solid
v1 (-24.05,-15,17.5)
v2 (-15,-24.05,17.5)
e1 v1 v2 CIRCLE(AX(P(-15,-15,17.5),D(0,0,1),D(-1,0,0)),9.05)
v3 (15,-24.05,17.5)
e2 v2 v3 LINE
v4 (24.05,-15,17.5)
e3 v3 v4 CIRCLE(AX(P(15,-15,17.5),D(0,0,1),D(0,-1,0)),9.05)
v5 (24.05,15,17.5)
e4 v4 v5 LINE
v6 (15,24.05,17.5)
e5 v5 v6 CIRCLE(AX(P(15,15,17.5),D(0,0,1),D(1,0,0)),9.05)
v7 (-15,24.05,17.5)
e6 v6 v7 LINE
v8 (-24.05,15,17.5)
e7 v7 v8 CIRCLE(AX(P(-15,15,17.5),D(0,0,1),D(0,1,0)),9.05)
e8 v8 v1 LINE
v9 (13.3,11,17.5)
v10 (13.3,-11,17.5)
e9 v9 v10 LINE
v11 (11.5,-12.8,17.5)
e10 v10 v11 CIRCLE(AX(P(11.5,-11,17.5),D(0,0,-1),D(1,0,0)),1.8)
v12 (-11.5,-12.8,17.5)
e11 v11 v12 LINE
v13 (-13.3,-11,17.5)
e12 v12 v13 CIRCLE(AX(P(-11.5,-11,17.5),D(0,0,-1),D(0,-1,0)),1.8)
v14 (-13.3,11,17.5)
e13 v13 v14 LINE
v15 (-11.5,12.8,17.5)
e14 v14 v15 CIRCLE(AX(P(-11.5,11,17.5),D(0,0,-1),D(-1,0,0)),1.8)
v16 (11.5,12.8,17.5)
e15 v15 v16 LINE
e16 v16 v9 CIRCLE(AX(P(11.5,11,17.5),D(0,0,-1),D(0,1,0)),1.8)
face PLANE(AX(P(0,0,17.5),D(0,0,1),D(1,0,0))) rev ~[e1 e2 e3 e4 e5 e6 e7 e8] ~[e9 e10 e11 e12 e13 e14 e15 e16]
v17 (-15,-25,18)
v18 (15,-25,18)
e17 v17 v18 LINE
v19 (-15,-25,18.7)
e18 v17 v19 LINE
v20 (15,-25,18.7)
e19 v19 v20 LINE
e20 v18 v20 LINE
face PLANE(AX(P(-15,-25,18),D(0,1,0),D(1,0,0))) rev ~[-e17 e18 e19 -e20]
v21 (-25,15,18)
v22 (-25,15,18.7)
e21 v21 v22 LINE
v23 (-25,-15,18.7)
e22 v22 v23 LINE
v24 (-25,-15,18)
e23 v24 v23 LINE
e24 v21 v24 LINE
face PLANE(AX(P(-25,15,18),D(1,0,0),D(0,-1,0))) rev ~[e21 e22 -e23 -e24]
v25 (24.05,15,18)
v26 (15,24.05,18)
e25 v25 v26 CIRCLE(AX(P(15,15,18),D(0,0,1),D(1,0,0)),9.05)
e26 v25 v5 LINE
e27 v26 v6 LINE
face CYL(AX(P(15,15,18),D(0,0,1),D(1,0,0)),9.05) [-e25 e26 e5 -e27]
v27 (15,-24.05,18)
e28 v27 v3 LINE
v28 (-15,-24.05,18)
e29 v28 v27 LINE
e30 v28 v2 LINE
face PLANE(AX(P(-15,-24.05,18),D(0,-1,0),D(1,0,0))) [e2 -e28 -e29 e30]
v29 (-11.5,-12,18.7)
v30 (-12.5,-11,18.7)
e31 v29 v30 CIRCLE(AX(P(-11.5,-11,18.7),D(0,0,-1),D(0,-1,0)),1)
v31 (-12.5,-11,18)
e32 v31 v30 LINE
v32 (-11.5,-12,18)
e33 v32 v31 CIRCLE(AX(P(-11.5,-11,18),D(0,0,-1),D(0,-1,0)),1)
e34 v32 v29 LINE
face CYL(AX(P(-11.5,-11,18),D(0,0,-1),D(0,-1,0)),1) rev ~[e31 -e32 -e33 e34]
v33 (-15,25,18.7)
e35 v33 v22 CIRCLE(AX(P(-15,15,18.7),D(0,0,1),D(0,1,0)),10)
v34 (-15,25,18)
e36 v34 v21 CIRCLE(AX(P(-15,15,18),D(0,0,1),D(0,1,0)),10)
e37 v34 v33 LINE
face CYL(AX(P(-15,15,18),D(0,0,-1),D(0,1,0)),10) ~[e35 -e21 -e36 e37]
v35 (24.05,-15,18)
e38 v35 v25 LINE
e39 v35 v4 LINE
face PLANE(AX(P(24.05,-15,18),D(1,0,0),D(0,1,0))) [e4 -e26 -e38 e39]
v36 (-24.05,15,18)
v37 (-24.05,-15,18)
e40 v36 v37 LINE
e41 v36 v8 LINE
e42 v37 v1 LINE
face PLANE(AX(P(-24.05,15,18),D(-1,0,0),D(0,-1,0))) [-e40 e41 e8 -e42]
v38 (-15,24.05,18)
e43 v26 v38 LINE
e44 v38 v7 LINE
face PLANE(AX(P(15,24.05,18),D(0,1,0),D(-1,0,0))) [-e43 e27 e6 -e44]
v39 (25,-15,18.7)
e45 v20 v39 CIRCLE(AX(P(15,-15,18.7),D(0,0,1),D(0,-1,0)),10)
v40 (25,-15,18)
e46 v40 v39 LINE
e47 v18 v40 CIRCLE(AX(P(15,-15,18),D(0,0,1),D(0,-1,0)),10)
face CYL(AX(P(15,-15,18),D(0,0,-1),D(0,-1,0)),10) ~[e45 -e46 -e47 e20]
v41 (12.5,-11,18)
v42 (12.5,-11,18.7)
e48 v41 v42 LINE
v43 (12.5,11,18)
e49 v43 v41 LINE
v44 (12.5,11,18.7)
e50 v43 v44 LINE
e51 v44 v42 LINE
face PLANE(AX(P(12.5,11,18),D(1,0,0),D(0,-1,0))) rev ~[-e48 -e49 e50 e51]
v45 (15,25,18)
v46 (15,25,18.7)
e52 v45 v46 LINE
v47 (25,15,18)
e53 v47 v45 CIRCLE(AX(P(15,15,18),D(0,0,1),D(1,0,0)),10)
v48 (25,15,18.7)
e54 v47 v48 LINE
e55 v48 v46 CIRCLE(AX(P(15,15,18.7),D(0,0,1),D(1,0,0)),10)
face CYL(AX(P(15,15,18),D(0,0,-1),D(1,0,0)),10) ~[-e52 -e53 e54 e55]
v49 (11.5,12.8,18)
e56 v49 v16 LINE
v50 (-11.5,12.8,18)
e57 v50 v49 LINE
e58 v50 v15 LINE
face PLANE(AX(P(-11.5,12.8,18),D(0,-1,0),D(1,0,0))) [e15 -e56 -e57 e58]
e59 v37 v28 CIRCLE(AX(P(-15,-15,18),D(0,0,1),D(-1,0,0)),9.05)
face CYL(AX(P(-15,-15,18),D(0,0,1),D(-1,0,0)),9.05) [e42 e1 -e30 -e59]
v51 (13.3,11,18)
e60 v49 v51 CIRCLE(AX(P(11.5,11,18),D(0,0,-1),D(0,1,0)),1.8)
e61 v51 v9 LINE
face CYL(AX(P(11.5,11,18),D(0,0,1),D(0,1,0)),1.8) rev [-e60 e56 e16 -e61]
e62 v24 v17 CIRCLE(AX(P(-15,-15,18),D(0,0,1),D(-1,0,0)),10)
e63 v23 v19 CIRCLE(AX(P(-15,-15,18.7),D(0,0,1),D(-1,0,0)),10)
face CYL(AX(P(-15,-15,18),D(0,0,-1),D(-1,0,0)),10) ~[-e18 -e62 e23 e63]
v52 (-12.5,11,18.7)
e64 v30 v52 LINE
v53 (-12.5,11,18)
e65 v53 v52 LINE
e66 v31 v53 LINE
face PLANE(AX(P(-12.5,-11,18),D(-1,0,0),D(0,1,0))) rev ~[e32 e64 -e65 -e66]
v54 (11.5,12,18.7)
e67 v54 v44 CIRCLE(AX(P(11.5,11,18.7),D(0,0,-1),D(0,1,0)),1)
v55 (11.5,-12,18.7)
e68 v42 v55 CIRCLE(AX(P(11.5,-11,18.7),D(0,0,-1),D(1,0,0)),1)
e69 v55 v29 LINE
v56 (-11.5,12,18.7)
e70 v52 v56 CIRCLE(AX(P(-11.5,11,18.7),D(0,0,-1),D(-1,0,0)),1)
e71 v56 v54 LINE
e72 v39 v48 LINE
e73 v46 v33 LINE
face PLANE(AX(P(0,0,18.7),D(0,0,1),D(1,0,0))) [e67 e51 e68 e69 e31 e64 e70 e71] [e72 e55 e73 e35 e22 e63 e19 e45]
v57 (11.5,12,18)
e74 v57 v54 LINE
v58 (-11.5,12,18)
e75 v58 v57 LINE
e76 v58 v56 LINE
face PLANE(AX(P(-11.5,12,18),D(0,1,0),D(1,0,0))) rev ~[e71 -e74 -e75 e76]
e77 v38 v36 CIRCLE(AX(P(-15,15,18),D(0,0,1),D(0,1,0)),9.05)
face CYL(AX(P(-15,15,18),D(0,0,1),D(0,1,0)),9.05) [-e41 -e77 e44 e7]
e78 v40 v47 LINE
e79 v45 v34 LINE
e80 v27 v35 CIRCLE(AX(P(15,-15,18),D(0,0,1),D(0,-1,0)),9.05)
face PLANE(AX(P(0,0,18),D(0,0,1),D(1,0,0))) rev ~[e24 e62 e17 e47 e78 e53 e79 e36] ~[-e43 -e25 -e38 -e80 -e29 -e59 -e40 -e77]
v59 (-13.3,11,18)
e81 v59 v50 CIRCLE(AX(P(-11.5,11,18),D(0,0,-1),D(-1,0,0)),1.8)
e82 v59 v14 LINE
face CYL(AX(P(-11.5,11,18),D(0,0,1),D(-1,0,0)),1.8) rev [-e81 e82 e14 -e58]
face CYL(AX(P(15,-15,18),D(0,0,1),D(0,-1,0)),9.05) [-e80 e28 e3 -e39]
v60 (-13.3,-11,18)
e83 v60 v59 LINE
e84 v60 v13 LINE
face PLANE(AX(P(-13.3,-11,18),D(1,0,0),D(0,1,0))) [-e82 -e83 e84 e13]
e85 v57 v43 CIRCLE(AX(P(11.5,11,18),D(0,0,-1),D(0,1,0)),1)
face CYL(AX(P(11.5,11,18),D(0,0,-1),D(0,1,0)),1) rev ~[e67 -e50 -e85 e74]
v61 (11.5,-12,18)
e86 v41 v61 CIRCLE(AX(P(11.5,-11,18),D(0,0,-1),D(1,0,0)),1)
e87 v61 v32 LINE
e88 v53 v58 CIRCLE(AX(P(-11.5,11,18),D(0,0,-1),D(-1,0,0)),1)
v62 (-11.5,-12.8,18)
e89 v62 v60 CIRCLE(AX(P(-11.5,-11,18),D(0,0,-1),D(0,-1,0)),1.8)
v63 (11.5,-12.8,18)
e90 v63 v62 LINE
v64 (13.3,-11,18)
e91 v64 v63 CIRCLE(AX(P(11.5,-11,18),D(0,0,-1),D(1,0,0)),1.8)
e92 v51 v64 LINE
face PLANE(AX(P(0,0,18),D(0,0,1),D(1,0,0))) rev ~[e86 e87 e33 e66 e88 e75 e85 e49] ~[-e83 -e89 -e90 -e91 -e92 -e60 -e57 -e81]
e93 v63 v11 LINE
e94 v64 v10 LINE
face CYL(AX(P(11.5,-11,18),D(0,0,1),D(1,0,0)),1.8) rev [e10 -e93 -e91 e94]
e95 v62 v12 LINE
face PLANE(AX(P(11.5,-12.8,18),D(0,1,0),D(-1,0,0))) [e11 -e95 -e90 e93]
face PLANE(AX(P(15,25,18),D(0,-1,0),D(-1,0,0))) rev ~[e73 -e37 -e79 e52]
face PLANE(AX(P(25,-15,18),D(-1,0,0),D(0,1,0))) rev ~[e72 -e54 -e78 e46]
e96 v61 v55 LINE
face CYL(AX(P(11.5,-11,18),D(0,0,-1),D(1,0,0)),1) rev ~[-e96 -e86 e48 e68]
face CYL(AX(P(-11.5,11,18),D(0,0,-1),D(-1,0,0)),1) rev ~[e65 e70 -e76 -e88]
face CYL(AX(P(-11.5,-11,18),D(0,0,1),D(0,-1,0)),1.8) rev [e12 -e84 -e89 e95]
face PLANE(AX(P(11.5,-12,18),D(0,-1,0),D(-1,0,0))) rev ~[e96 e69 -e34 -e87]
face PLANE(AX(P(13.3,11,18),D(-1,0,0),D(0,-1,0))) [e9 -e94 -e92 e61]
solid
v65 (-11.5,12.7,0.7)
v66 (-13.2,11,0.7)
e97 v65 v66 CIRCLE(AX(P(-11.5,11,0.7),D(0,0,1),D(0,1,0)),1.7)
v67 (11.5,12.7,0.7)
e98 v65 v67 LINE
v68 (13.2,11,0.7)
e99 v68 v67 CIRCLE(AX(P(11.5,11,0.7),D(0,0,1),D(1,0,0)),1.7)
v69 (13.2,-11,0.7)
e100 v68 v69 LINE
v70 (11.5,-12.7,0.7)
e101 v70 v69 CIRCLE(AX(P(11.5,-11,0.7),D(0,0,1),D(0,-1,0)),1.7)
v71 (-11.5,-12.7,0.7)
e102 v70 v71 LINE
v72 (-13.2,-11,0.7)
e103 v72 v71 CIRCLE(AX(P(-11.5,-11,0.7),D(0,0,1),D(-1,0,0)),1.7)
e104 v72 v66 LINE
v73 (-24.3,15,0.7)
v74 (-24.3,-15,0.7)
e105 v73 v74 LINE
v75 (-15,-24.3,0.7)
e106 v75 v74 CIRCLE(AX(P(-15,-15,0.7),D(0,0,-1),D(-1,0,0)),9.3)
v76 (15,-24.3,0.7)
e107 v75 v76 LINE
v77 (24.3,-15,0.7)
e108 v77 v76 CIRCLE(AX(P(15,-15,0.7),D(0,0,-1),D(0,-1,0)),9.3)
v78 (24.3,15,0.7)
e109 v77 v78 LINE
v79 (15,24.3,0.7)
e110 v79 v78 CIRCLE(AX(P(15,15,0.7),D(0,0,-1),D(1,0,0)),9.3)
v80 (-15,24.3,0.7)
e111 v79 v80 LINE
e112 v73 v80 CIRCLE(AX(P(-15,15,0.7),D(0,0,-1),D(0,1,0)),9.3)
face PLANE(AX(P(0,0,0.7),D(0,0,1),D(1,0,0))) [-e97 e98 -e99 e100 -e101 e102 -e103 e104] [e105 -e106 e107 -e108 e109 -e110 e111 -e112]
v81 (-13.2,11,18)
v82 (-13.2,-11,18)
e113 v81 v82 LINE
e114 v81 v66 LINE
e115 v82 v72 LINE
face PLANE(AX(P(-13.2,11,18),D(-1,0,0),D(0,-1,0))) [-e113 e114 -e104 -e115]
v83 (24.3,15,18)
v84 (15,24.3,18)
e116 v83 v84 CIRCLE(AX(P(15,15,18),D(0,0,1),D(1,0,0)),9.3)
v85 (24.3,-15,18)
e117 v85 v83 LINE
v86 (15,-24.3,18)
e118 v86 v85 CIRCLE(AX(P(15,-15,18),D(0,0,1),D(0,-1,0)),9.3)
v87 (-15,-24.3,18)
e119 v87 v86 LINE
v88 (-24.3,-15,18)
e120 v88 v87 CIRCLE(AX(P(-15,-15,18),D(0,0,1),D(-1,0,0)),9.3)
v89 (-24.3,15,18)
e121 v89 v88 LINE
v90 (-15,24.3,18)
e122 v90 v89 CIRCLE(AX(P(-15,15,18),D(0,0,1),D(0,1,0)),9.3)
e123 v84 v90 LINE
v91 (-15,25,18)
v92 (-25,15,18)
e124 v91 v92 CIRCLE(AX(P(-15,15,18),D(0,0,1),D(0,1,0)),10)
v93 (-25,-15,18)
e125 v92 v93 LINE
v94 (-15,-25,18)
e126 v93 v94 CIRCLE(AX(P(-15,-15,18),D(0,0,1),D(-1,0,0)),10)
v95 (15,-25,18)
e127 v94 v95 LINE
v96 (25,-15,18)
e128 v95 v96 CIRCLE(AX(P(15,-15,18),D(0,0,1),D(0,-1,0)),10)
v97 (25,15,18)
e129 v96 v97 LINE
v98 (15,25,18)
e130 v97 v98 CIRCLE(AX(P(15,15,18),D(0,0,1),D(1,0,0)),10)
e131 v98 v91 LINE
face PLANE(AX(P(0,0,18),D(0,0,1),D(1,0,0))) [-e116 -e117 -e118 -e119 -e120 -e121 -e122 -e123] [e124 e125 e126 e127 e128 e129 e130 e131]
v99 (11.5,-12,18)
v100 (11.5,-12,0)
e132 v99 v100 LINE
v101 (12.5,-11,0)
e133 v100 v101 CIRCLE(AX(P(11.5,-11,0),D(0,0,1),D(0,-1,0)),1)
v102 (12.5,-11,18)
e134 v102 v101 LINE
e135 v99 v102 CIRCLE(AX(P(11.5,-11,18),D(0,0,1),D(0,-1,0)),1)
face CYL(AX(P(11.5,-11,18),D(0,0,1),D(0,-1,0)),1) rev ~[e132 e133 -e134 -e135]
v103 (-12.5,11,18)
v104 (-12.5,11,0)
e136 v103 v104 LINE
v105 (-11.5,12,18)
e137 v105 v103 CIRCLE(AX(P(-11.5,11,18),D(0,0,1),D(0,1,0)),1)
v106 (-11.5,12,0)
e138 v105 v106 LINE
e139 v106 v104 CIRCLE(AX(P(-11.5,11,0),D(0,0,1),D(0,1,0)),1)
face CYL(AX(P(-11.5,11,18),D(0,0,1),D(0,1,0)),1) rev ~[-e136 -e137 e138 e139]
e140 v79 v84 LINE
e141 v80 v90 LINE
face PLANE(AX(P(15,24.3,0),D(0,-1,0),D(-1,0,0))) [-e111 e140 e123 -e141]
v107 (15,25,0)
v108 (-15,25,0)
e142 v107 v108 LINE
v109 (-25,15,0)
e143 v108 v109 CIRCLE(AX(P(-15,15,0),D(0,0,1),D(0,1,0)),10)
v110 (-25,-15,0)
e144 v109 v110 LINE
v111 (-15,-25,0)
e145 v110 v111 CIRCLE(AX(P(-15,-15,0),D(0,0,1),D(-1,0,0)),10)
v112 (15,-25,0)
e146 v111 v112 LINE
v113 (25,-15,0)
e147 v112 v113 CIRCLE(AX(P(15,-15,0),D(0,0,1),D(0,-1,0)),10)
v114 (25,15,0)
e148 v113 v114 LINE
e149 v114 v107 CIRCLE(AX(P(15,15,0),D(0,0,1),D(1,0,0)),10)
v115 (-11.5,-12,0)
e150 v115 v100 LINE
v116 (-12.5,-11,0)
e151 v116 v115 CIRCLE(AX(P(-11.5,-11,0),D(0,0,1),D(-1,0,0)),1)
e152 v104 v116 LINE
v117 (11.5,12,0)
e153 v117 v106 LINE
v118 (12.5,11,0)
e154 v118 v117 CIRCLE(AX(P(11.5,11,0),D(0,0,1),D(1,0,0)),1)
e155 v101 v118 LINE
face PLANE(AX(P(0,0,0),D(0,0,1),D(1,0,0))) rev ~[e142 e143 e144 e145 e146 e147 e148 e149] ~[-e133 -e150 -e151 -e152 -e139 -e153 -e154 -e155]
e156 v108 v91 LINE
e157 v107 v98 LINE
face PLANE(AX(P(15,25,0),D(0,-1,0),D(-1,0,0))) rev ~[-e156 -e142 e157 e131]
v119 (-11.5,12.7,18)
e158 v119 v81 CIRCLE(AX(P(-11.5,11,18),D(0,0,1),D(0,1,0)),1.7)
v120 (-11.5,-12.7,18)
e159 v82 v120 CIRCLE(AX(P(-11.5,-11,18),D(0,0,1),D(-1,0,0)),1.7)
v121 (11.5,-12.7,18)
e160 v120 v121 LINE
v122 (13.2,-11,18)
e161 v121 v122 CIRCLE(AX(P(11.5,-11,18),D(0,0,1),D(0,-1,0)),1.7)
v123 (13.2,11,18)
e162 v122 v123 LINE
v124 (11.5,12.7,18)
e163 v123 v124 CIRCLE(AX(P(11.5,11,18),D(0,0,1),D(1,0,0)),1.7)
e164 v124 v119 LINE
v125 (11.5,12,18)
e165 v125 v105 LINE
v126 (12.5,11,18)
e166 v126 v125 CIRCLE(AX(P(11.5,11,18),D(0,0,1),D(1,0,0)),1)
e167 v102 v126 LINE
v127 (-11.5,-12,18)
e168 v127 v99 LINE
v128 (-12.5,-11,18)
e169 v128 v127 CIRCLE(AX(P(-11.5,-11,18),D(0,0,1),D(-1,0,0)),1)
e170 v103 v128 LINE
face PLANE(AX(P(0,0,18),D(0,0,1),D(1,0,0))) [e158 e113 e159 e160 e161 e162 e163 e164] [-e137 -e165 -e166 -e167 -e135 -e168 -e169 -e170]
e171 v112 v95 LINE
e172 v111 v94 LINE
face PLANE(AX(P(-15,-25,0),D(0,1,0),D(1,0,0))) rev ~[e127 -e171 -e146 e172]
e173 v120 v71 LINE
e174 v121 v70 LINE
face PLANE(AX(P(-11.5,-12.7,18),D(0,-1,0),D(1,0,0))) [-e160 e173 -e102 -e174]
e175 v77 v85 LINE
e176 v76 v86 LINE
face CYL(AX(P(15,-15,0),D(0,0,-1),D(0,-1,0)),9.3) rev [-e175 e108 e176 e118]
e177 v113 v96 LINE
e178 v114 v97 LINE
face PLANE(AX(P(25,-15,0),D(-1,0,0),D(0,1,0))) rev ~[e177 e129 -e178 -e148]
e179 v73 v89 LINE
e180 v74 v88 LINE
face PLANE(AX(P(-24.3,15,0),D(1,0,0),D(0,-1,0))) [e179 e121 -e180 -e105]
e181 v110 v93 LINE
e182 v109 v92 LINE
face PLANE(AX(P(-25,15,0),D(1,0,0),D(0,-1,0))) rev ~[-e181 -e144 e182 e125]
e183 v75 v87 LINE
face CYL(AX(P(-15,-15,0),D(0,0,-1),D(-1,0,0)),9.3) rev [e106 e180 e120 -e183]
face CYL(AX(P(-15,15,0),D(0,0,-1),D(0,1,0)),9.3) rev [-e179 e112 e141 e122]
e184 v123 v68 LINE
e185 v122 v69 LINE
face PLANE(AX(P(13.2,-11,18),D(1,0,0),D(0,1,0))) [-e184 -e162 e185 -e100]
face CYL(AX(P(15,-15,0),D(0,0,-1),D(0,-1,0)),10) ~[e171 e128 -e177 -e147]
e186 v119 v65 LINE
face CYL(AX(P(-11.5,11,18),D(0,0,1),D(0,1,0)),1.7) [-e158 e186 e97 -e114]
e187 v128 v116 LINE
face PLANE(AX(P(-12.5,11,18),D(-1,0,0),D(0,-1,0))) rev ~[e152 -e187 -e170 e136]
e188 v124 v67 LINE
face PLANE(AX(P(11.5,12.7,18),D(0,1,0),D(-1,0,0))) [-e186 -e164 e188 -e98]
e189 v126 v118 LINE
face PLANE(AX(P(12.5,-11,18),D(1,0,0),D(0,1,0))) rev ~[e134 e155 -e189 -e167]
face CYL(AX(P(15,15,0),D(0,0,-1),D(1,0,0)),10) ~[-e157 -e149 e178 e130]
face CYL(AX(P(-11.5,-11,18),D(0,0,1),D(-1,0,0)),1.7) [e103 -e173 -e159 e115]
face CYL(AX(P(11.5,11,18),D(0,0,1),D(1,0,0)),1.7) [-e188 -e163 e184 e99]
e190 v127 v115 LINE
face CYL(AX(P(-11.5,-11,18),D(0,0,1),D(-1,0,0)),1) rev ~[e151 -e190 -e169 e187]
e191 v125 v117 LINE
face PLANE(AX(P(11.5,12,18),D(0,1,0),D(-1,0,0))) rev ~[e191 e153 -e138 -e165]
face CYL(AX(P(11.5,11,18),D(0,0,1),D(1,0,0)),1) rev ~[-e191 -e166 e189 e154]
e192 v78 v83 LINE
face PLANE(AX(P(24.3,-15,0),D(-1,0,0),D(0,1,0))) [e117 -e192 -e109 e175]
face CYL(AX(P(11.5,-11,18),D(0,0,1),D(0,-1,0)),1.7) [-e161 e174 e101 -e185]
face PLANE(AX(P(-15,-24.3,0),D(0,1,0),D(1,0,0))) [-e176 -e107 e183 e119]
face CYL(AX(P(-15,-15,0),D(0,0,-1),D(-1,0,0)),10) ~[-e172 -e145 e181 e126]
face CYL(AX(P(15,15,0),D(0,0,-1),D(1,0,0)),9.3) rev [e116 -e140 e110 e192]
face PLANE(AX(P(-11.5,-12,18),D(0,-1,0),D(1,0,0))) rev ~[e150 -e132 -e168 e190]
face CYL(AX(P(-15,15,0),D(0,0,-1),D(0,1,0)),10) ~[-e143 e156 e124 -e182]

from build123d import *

# Parameters (mm, degrees)
F1_DEPTH = 18
F3_DEPTH = 18.001
F4_T     = -0.7
F6_DEPTH = 0.5
F8_DEPTH = 0.7


with BuildPart() as f1:
    # F0 (on Top) → F1 (new body)
    with BuildSketch(Plane.XY):
        with BuildLine():
            ThreePointArc((25, 15), (22.0710678119, 22.0710678119), (15, 25))
            Line((15, 25), (-15, 25))
            ThreePointArc((-15, 25), (-22.0710678119, 22.0710678119), (-25, 15))
            Line((-25, 15), (-25, -15))
            ThreePointArc((-25, -15), (-22.0710678119, -22.0710678119), (-15, -25))
            Line((-15, -25), (15, -25))
            ThreePointArc((15, -25), (22.0710678119, -22.0710678119), (25, -15))
            Line((25, -15), (25, 15))
        make_face()
    extrude(amount=F1_DEPTH)

    # F2 (on face) → F3 (cut, through all)
    with BuildSketch(Plane.XY.offset(18)):
        with BuildLine():
            ThreePointArc((12.5, 11), (12.2071067812, 11.7071067812), (11.5, 12))
            Line((11.5, 12), (-11.5, 12))
            ThreePointArc((-11.5, 12), (-12.2071067812, 11.7071067812), (-12.5, 11))
            Line((-12.5, 11), (-12.5, -11))
            ThreePointArc((-12.5, -11), (-12.2071067812, -11.7071067812), (-11.5, -12))
            Line((-11.5, -12), (11.5, -12))
            ThreePointArc((11.5, -12), (12.2071067812, -11.7071067812), (12.5, -11))
            Line((12.5, -11), (12.5, 11))
        make_face()
    extrude(amount=-F3_DEPTH, mode=Mode.SUBTRACT)

    # F4
    f4_openings = [f1.faces().sort_by_distance(p)[0] for p in [
        (24.292893, 0, 18),
    ]]
    offset(amount=F4_T, openings=f4_openings)


with BuildPart() as f6:
    # F5 (on face) → F6 (new body)
    with BuildSketch(Plane.XY.offset(18)):
        with BuildLine():
            Line((-24.05, 15), (-24.05, -15))
            ThreePointArc((-24.05, -15), (-21.3993163697, -21.3993163697), (-15, -24.05))
            Line((-15, -24.05), (15, -24.05))
            ThreePointArc((15, -24.05), (21.3993163697, -21.3993163697), (24.05, -15))
            Line((24.05, -15), (24.05, 15))
            ThreePointArc((24.05, 15), (21.3993163697, 21.3993163697), (15, 24.05))
            Line((15, 24.05), (-15, 24.05))
            ThreePointArc((-15, 24.05), (-21.3993163697, 21.3993163697), (-24.05, 15))
        make_face()
        with BuildLine():
            ThreePointArc((15, 23.5), (21.0104076401, 21.0104076401), (23.5, 15))
            Line((23.5, 15), (23.5, -15))
            ThreePointArc((23.5, -15), (21.0104076401, -21.0104076401), (15, -23.5))
            Line((15, -23.5), (-15, -23.5))
            ThreePointArc((-15, -23.5), (-21.0104076401, -21.0104076401), (-23.5, -15))
            Line((-23.5, -15), (-23.5, 15))
            ThreePointArc((-23.5, 15), (-21.0104076401, 21.0104076401), (-15, 23.5))
            Line((-15, 23.5), (15, 23.5))
        make_face(mode=Mode.SUBTRACT)
        with BuildLine():
            Line((23.5, -15), (23.5, 15))
            ThreePointArc((23.5, 15), (21.0104076401, 21.0104076401), (15, 23.5))
            Line((15, 23.5), (-15, 23.5))
            ThreePointArc((-15, 23.5), (-21.0104076401, 21.0104076401), (-23.5, 15))
            Line((-23.5, 15), (-23.5, -15))
            ThreePointArc((-23.5, -15), (-21.0104076401, -21.0104076401), (-15, -23.5))
            Line((-15, -23.5), (15, -23.5))
            ThreePointArc((15, -23.5), (21.0104076401, -21.0104076401), (23.5, -15))
        make_face()
        with BuildLine():
            ThreePointArc((11.5, 12.8), (12.7727922061, 12.2727922061), (13.3, 11))
            Line((13.3, 11), (13.3, -11))
            ThreePointArc((13.3, -11), (12.7727922061, -12.2727922061), (11.5, -12.8))
            Line((11.5, -12.8), (-11.5, -12.8))
            ThreePointArc((-11.5, -12.8), (-12.7727922061, -12.2727922061), (-13.3, -11))
            Line((-13.3, -11), (-13.3, 11))
            ThreePointArc((-13.3, 11), (-12.7727922061, 12.2727922061), (-11.5, 12.8))
            Line((-11.5, 12.8), (11.5, 12.8))
        make_face(mode=Mode.SUBTRACT)
    extrude(amount=-F6_DEPTH)

    # F7 (on face) + F6_face1 (on face) → F8 (join)
    with BuildSketch(Plane.XY.offset(18)):
        with BuildLine():
            Line((15, 25), (-15, 25))
            ThreePointArc((-15, 25), (-22.0710678119, 22.0710678119), (-25, 15))
            Line((-25, 15), (-25, -15))
            ThreePointArc((-25, -15), (-22.0710678119, -22.0710678119), (-15, -25))
            Line((-15, -25), (15, -25))
            ThreePointArc((15, -25), (22.0710678119, -22.0710678119), (25, -15))
            Line((25, -15), (25, 15))
            ThreePointArc((25, 15), (22.0710678119, 22.0710678119), (15, 25))
        make_face()
        with BuildLine():
            Line((-12.5, -11), (-12.5, 11))
            ThreePointArc((-12.5, 11), (-12.2071067812, 11.7071067812), (-11.5, 12))
            Line((-11.5, 12), (11.5, 12))
            ThreePointArc((11.5, 12), (12.2071067812, 11.7071067812), (12.5, 11))
            Line((12.5, 11), (12.5, -11))
            ThreePointArc((12.5, -11), (12.2071067812, -11.7071067812), (11.5, -12))
            Line((11.5, -12), (-11.5, -12))
            ThreePointArc((-11.5, -12), (-12.2071067812, -11.7071067812), (-12.5, -11))
        make_face(mode=Mode.SUBTRACT)
    with BuildSketch(Plane(origin=(0, 0, 17.5), x_dir=(1, 0, 0), z_dir=(0, 0, -1))):
        with BuildLine():
            Line((-15, -24.05), (15, -24.05))
            ThreePointArc((15, -24.05), (21.3993163697, -21.3993163697), (24.05, -15))
            Line((24.05, -15), (24.05, 15))
            ThreePointArc((24.05, 15), (21.3993163697, 21.3993163697), (15, 24.05))
            Line((15, 24.05), (-15, 24.05))
            ThreePointArc((-15, 24.05), (-21.3993163697, 21.3993163697), (-24.05, 15))
            Line((-24.05, 15), (-24.05, -15))
            ThreePointArc((-24.05, -15), (-21.3993163697, -21.3993163697), (-15, -24.05))
        make_face()
        with BuildLine():
            ThreePointArc((13.3, -11), (12.7727922061, -12.2727922061), (11.5, -12.8))
            Line((11.5, -12.8), (-11.5, -12.8))
            ThreePointArc((-11.5, -12.8), (-12.7727922061, -12.2727922061), (-13.3, -11))
            Line((-13.3, -11), (-13.3, 11))
            ThreePointArc((-13.3, 11), (-12.7727922061, 12.2727922061), (-11.5, 12.8))
            Line((-11.5, 12.8), (11.5, 12.8))
            ThreePointArc((11.5, 12.8), (12.7727922061, 12.2727922061), (13.3, 11))
            Line((13.3, 11), (13.3, -11))
        make_face(mode=Mode.SUBTRACT)
    extrude(amount=F8_DEPTH, dir=(0, 0, 1))


solid = Compound([f1.part, f6.part])
